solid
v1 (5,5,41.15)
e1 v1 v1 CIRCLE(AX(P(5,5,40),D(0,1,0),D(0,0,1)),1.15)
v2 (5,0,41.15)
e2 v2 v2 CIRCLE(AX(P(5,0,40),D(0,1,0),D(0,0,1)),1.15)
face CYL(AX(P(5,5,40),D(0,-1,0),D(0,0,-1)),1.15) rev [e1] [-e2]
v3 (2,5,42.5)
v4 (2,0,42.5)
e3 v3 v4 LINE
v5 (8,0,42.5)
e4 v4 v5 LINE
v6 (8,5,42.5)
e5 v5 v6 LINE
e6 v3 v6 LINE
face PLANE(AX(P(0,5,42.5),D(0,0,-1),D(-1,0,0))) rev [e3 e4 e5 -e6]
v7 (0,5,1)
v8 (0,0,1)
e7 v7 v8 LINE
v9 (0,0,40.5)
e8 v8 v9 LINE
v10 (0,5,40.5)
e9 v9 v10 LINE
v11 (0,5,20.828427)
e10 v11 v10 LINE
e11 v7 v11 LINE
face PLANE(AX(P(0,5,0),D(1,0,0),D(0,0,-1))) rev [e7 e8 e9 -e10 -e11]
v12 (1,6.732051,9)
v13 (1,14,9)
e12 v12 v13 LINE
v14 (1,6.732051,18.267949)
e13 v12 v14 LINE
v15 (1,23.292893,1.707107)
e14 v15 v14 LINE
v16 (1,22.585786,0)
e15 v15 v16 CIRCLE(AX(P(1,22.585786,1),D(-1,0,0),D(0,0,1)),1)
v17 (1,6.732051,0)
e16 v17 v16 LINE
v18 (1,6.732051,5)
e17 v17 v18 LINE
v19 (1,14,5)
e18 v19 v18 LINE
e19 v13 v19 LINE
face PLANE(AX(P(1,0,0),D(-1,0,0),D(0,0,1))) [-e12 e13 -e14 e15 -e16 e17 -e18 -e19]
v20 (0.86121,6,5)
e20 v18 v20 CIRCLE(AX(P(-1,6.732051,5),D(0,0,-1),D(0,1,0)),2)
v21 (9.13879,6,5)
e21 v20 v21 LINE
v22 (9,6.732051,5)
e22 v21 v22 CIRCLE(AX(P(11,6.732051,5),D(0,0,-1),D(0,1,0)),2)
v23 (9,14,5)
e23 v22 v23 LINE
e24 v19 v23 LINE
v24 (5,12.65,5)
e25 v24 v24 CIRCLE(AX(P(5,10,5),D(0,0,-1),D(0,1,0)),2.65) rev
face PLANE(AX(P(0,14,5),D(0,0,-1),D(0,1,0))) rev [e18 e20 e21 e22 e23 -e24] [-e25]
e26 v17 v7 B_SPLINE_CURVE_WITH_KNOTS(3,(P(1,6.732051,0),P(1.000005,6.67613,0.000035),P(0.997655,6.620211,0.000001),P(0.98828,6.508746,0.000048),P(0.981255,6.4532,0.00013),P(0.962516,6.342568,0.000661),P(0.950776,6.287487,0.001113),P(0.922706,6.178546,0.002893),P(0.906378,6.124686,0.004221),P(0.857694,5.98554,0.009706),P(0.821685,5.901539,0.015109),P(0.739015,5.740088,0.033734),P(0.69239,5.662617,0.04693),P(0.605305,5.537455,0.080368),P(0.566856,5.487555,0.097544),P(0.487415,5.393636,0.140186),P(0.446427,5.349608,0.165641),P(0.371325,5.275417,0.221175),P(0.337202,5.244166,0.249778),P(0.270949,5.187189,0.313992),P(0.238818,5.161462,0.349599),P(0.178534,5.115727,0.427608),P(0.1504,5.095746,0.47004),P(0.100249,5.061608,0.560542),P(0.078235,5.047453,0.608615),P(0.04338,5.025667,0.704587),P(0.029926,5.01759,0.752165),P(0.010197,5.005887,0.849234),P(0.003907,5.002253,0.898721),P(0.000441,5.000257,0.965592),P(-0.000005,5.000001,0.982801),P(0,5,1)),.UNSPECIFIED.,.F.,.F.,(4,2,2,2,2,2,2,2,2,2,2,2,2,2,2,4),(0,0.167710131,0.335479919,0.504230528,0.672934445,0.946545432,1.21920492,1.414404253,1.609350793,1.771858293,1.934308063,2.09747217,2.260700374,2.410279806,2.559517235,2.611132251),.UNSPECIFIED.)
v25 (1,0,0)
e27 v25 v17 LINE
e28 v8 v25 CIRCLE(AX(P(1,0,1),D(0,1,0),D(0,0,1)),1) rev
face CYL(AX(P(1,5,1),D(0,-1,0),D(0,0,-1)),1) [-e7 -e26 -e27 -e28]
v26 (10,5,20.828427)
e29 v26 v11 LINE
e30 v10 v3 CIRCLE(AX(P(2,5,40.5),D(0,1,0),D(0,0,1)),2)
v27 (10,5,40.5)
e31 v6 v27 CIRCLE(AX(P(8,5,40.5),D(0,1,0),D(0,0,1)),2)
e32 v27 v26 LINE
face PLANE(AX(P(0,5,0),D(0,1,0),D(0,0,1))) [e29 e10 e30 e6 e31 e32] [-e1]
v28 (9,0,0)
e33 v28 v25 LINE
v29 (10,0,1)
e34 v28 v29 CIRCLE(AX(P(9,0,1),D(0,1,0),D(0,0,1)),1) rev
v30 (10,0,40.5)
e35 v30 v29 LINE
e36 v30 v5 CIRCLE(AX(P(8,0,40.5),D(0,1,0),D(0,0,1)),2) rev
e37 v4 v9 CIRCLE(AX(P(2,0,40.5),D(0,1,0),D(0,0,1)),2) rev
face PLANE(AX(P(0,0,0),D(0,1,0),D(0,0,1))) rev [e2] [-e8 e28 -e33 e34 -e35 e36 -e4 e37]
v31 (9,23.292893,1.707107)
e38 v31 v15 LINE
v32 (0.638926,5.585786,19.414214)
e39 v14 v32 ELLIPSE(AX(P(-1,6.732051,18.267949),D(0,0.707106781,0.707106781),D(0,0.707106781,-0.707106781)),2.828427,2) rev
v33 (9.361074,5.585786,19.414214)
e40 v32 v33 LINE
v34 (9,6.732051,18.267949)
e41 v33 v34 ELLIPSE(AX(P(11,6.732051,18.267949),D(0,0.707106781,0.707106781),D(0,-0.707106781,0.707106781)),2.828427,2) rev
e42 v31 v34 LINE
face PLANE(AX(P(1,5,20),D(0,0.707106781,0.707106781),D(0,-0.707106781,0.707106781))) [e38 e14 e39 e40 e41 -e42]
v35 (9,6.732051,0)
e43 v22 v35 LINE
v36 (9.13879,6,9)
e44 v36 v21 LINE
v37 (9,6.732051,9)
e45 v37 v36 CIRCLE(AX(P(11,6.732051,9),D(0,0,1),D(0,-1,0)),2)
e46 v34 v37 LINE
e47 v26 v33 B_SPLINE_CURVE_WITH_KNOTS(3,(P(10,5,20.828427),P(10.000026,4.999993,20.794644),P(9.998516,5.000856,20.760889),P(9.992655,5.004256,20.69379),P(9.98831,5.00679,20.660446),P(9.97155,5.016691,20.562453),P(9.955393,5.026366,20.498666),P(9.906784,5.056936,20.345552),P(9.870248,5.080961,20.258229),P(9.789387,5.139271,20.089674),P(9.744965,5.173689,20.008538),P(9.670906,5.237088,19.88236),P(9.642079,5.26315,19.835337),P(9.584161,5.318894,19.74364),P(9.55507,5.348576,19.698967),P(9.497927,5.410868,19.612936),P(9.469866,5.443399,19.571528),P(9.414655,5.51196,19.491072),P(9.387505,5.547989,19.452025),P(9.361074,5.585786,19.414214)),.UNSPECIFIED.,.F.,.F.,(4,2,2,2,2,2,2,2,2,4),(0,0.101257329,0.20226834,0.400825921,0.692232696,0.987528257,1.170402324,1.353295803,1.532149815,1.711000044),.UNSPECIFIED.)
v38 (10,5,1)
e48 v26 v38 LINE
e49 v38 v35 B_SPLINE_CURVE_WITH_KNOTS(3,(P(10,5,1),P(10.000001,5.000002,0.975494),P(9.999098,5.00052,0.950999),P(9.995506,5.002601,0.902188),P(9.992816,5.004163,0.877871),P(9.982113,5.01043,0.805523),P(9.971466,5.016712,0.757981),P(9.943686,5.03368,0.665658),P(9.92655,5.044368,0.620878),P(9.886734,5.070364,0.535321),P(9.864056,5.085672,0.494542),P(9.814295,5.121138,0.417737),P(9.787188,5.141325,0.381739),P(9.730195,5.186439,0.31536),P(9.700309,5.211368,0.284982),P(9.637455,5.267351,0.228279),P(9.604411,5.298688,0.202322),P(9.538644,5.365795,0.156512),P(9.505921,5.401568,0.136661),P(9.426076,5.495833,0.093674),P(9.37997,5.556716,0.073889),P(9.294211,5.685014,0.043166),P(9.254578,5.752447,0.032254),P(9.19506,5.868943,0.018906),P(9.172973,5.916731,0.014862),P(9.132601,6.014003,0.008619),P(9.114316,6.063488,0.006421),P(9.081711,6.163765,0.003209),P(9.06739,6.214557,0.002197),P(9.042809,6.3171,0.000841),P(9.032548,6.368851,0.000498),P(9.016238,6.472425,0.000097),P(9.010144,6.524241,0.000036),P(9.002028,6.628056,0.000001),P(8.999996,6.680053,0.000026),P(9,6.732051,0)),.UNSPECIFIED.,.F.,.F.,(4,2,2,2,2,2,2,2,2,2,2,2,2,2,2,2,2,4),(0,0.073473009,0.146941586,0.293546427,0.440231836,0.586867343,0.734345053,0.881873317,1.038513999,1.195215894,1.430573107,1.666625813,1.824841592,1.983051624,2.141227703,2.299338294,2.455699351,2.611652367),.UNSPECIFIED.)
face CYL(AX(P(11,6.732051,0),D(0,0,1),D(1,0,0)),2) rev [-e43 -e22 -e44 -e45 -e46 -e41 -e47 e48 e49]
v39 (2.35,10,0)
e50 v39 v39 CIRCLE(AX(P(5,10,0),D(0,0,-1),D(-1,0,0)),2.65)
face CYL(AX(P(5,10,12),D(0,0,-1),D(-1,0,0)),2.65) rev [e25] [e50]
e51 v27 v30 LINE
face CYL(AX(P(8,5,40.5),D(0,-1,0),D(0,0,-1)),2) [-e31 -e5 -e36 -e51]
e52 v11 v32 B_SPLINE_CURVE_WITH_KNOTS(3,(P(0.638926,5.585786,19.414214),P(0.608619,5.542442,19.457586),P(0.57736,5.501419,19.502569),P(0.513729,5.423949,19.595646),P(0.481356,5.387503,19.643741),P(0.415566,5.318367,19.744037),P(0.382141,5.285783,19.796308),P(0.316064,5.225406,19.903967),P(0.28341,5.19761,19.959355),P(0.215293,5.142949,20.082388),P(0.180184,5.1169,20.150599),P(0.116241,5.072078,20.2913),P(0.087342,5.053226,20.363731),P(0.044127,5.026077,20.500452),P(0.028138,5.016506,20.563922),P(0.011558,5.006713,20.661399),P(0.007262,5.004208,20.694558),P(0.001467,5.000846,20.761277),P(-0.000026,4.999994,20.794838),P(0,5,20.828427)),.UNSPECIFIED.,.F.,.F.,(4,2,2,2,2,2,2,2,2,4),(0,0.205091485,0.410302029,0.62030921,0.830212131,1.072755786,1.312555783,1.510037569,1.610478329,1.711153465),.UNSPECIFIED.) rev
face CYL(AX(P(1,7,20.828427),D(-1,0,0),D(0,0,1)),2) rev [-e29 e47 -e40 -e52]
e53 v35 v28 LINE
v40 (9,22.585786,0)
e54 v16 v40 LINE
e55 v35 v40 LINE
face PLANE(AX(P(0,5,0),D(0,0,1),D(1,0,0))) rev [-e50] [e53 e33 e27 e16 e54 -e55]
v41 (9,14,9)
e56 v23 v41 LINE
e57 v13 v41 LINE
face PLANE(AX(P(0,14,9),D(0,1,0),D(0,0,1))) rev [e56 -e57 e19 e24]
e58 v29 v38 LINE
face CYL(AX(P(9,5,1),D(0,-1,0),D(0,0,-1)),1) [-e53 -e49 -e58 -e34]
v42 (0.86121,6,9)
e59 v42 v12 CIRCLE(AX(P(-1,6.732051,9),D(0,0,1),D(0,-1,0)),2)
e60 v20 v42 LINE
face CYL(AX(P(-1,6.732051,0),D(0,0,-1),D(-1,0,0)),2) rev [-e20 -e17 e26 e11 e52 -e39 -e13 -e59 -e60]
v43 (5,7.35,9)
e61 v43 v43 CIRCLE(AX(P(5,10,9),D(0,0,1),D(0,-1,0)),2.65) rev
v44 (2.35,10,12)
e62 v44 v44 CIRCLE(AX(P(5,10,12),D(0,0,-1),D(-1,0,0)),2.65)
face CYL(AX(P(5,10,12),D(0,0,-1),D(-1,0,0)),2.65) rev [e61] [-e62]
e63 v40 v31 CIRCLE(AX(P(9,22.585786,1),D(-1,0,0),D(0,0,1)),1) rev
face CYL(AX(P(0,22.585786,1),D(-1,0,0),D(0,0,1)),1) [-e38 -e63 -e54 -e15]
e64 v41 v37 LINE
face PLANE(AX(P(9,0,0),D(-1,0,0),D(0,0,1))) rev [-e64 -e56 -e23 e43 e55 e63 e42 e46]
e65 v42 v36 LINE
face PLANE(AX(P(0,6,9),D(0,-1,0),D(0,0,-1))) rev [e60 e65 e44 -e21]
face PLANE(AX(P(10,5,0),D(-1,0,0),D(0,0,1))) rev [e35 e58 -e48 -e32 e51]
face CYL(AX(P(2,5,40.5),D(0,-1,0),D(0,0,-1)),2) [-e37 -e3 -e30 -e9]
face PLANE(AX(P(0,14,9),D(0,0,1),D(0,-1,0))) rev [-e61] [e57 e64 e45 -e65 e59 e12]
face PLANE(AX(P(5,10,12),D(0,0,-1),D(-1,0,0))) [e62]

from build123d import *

# Parameters (mm, degrees)
SKETCH2_W                = 10
SKETCH2_H                = 42.5
SKETCH2_R                = 1.15
BOSS_EXTRUDE1_DEPTH      = 5
BOSS_EXTRUDE2_DEPTH      = 4
BOSS_EXTRUDE2_DEPTH_BACK = 4
SKETCH4_R                = 2.65
CUT_EXTRUDE1_DEPTH       = 12
SKETCH5_W                = 4
SKETCH5_H                = 8
CUT_EXTRUDE2_DEPTH       = 51.122350304
FILLET1_R                = 2
FILLET2_R                = 1


# Some blends are built 0.0001 mm under size
with BuildPart() as part:
    # Sketch2 → Boss-Extrude1 (new body)
    with BuildSketch(Plane(origin=(0, 0, 0), x_dir=(1, 0, 0), z_dir=(0, 1, 0))):
        with Locations((5, -21.25)):
            Rectangle(SKETCH2_W, SKETCH2_H)
        with Locations(Location((5, -40, 0), (0, 0, 270))):
            Circle(SKETCH2_R, mode=Mode.SUBTRACT)
    extrude(amount=BOSS_EXTRUDE1_DEPTH)

    # Sketch3 → Boss-Extrude2 (add, two sides: drawn at the far end of the back side and taken through both)
    with BuildSketch(Plane(origin=(5, 0, 0), x_dir=(0, 0, -1), z_dir=(1, 0, 0)).offset(-BOSS_EXTRUDE2_DEPTH_BACK)):
        Polygon((0, 5), (-20, 5), (0, 25), align=None)
    extrude(amount=BOSS_EXTRUDE2_DEPTH + BOSS_EXTRUDE2_DEPTH_BACK)

    # Sketch4 → Cut-Extrude1 (cut)
    with BuildSketch(Plane(origin=(0, 0, 0), x_dir=(-1, 0, 0), z_dir=(0, 0, -1))):
        with Locations((-5, 10)):
            Circle(SKETCH4_R)
    extrude(amount=-CUT_EXTRUDE1_DEPTH, mode=Mode.SUBTRACT)

    # Sketch5 → Cut-Extrude2 (cut, through all)
    with BuildSketch(Plane(origin=(9, 0, 0), x_dir=(0, 0, -1), z_dir=(1, 0, 0))):
        with Locations((-7, 10)):
            Rectangle(SKETCH5_W, SKETCH5_H)
    extrude(amount=-CUT_EXTRUDE2_DEPTH, mode=Mode.SUBTRACT)

    # Fillet1
    # the kernel refuses this fillet: 2 mm, written as the material it adds along each edge
    with BuildSketch(Plane(origin=(1, 5, 0), x_dir=(-1, 0, 0), z_dir=(0, 0, 1))) as fillet1_piece_1_section:
        with BuildLine():
            CenterArc((2, -1.732050808), FILLET1_R, 120, 60)
            Line((0, -1.732050808), (0, 0))
            Line((0, 0), (1, 0))
        make_face()
    fillet1_piece_1 = extrude(amount=24.330127019, mode=Mode.PRIVATE)
    fillet1_piece_1 = split(fillet1_piece_1, bisect_by=Plane(origin=(1, 15, 10), z_dir=(0, -0.7071067811865475, -0.7071067811865476)), keep=Keep.TOP, mode=Mode.PRIVATE)
    fillet1_piece_1 = split(fillet1_piece_1, bisect_by=Plane(origin=(1, 6, 0), z_dir=(0, -1, 0)), keep=Keep.TOP, mode=Mode.PRIVATE)
    add(fillet1_piece_1)
    with BuildSketch(Plane(origin=(1, 5, 0), x_dir=(-1, 0, 0), z_dir=(0, 0, 1))) as fillet1_piece_2_section:
        with BuildLine():
            CenterArc((2, -1.732050808), FILLET1_R, 120, 60)
            Line((0, -1.732050808), (0, 0))
            Line((0, 0), (1, 0))
        make_face()
    fillet1_piece_2 = extrude(amount=24.330127019, mode=Mode.PRIVATE)
    fillet1_piece_2 = split(fillet1_piece_2, bisect_by=Plane(origin=(1, 5, 5), z_dir=(0, 0, -1)), keep=Keep.TOP, mode=Mode.PRIVATE)
    add(fillet1_piece_2)
    with BuildSketch(Plane(origin=(1, 5, -4.330127019), x_dir=(-1, 0, 0), z_dir=(0, 0, 1))) as fillet1_piece_3_section:
        with BuildLine():
            CenterArc((2, -1.732050808), FILLET1_R, 120, 60)
            Line((0, -1.732050808), (0, 0))
            Line((0, 0), (1, 0))
        make_face()
    fillet1_piece_3 = extrude(amount=28.660254038, mode=Mode.PRIVATE)
    fillet1_piece_3 = split(fillet1_piece_3, bisect_by=Plane(origin=(1, 17.165063509, 7.834936491), z_dir=(0, -0.7071067811865475, -0.7071067811865476)), keep=Keep.TOP, mode=Mode.PRIVATE)
    fillet1_piece_3 = split(fillet1_piece_3, bisect_by=Plane(origin=(1, 5, 9), z_dir=(0, 0, 1)), keep=Keep.TOP, mode=Mode.PRIVATE)
    add(fillet1_piece_3)
    with BuildSketch(Plane(origin=(9, 5, 0), x_dir=(1, 0, 0), z_dir=(0, 0, 1))) as fillet1_piece_4_section:
        with BuildLine():
            CenterArc((2, 1.732050808), FILLET1_R, 180, 60)
            Line((0, 1.732050808), (0, 0))
            Line((0, 0), (1, 0))
        make_face()
    fillet1_piece_4 = extrude(amount=24.330127019, mode=Mode.PRIVATE)
    fillet1_piece_4 = split(fillet1_piece_4, bisect_by=Plane(origin=(9, 15, 10), z_dir=(0, -0.7071067811865475, -0.7071067811865476)), keep=Keep.TOP, mode=Mode.PRIVATE)
    fillet1_piece_4 = split(fillet1_piece_4, bisect_by=Plane(origin=(9, 6, 0), z_dir=(0, -1, 0)), keep=Keep.TOP, mode=Mode.PRIVATE)
    add(fillet1_piece_4)
    with BuildSketch(Plane(origin=(9, 5, 0), x_dir=(1, 0, 0), z_dir=(0, 0, 1))) as fillet1_piece_5_section:
        with BuildLine():
            CenterArc((2, 1.732050808), FILLET1_R, 180, 60)
            Line((0, 1.732050808), (0, 0))
            Line((0, 0), (1, 0))
        make_face()
    fillet1_piece_5 = extrude(amount=24.330127019, mode=Mode.PRIVATE)
    fillet1_piece_5 = split(fillet1_piece_5, bisect_by=Plane(origin=(9, 5, 5), z_dir=(0, 0, -1)), keep=Keep.TOP, mode=Mode.PRIVATE)
    add(fillet1_piece_5)
    with BuildSketch(Plane(origin=(9, 5, -4.330127019), x_dir=(1, 0, 0), z_dir=(0, 0, 1))) as fillet1_piece_6_section:
        with BuildLine():
            CenterArc((2, 1.732050808), FILLET1_R, 180, 60)
            Line((0, 1.732050808), (0, 0))
            Line((0, 0), (1, 0))
        make_face()
    fillet1_piece_6 = extrude(amount=28.660254038, mode=Mode.PRIVATE)
    fillet1_piece_6 = split(fillet1_piece_6, bisect_by=Plane(origin=(9, 17.165063509, 7.834936491), z_dir=(0, -0.7071067811865475, -0.7071067811865476)), keep=Keep.TOP, mode=Mode.PRIVATE)
    fillet1_piece_6 = split(fillet1_piece_6, bisect_by=Plane(origin=(9, 5, 9), z_dir=(0, 0, 1)), keep=Keep.TOP, mode=Mode.PRIVATE)
    add(fillet1_piece_6)
    with BuildSketch(Plane(origin=(9, 5, 20), x_dir=(0, 0, 1), z_dir=(-1, 0, 0))) as fillet1_piece_7:
        with BuildLine():
            CenterArc((FILLET1_R * 0.414213562373, FILLET1_R), FILLET1_R, 225, 45)
            Line((-FILLET1_R * 0.292893218813, FILLET1_R * 0.292893218813), (0, 0))
            Line((0, 0), (FILLET1_R * 0.414213562373, 0))
        make_face()
    extrude(amount=8)
    with BuildSketch(Plane(origin=(9, 5, 20), x_dir=(0, 0, 1), z_dir=(-1, 0, 0))) as fillet1_piece_8a_section:
        with BuildLine():
            CenterArc((FILLET1_R * 0.414213562373, FILLET1_R), FILLET1_R, 225, 45)
            Line((-FILLET1_R * 0.292893218813, FILLET1_R * 0.292893218813), (0, 0))
            Line((0, 0), (FILLET1_R * 0.414213562373, 0))
        make_face()
    fillet1_piece_8a = extrude(amount=10.071067812, mode=Mode.PRIVATE)
    fillet1_piece_8a = split(fillet1_piece_8a, bisect_by=Plane(origin=(0, 5, 20), z_dir=(1, 0, 0)), keep=Keep.TOP, mode=Mode.PRIVATE)
    fillet1_piece_8a = split(fillet1_piece_8a, bisect_by=Plane(origin=(1, 5, 20), z_dir=(-1, 0, 0)), keep=Keep.TOP, mode=Mode.PRIVATE)
    with BuildSketch(Plane(origin=(1, 5, 0), x_dir=(-1, 0, 0), z_dir=(0, 0, 1))) as fillet1_piece_8b_section:
        with BuildLine():
            CenterArc((2, -1.732050808), FILLET1_R, 120, 60)
            Line((0, -1.732050808), (0, 0))
            Line((0, 0), (1, 0))
        make_face()
    fillet1_piece_8b = extrude(amount=24.330127019, mode=Mode.PRIVATE)
    fillet1_piece_8b = split(fillet1_piece_8b, bisect_by=Plane(origin=(1, 15, 10), z_dir=(0, 0.7071067811865475, 0.7071067811865476)), keep=Keep.TOP, mode=Mode.PRIVATE)
    fillet1_piece_8b = split(fillet1_piece_8b, bisect_by=Plane(origin=(1, 6, 0), z_dir=(0, -1, 0)), keep=Keep.TOP, mode=Mode.PRIVATE)
    fillet1_piece_8 = fillet1_piece_8a & fillet1_piece_8b
    add(fillet1_piece_8)
    with BuildSketch(Plane(origin=(9, 5, 0), x_dir=(1, 0, 0), z_dir=(0, 0, 1))) as fillet1_piece_9a_section:
        with BuildLine():
            CenterArc((2, 1.732050808), FILLET1_R, 180, 60)
            Line((0, 1.732050808), (0, 0))
            Line((0, 0), (1, 0))
        make_face()
    fillet1_piece_9a = extrude(amount=24.330127019, mode=Mode.PRIVATE)
    fillet1_piece_9a = split(fillet1_piece_9a, bisect_by=Plane(origin=(9, 15, 10), z_dir=(0, 0.7071067811865475, 0.7071067811865476)), keep=Keep.TOP, mode=Mode.PRIVATE)
    fillet1_piece_9a = split(fillet1_piece_9a, bisect_by=Plane(origin=(9, 6, 0), z_dir=(0, -1, 0)), keep=Keep.TOP, mode=Mode.PRIVATE)
    with BuildSketch(Plane(origin=(11.071067812, 5, 20), x_dir=(0, 0, 1), z_dir=(-1, 0, 0))) as fillet1_piece_9b_section:
        with BuildLine():
            CenterArc((FILLET1_R * 0.414213562373, FILLET1_R), FILLET1_R, 225, 45)
            Line((-FILLET1_R * 0.292893218813, FILLET1_R * 0.292893218813), (0, 0))
            Line((0, 0), (FILLET1_R * 0.414213562373, 0))
        make_face()
    fillet1_piece_9b = extrude(amount=10.071067812, mode=Mode.PRIVATE)
    fillet1_piece_9b = split(fillet1_piece_9b, bisect_by=Plane(origin=(10, 5, 20), z_dir=(-1, 0, 0)), keep=Keep.TOP, mode=Mode.PRIVATE)
    fillet1_piece_9b = split(fillet1_piece_9b, bisect_by=Plane(origin=(9, 5, 20), z_dir=(1, 0, 0)), keep=Keep.TOP, mode=Mode.PRIVATE)
    fillet1_piece_9 = fillet1_piece_9a & fillet1_piece_9b
    add(fillet1_piece_9)
    # the kernel refuses this fillet: 2 mm, written as the material it takes off along each edge
    with BuildSketch(Plane(origin=(0, -5, 42.5), x_dir=(1, 0, 0), z_dir=(0, 1, 0))) as fillet1_2_piece_1:
        with BuildLine():
            CenterArc((FILLET1_R, FILLET1_R), FILLET1_R, 180, 90)
            Line((0, FILLET1_R), (0, 0))
            Line((0, 0), (FILLET1_R, 0))
        make_face()
    extrude(amount=15, mode=Mode.SUBTRACT)
    with BuildSketch(Plane(origin=(10, -5, 42.5), x_dir=(-1, 0, 0), z_dir=(0, 1, 0))) as fillet1_2_piece_2:
        with BuildLine():
            CenterArc((FILLET1_R, -FILLET1_R), FILLET1_R, 90, 90)
            Line((0, -FILLET1_R), (0, 0))
            Line((0, 0), (FILLET1_R, 0))
        make_face()
    extrude(amount=15, mode=Mode.SUBTRACT)

    # Fillet2
    fillet2_edges = [part.edges().sort_by_distance(p)[0] for p in [
        (0, 2.5, 0),
        (10, 2.5, 0),
        (5, 25, 0),
    ]]
    fillet(fillet2_edges, radius=FILLET2_R - 0.0001)  # a hair under: the kernel refuses the full size


solid = part.part
